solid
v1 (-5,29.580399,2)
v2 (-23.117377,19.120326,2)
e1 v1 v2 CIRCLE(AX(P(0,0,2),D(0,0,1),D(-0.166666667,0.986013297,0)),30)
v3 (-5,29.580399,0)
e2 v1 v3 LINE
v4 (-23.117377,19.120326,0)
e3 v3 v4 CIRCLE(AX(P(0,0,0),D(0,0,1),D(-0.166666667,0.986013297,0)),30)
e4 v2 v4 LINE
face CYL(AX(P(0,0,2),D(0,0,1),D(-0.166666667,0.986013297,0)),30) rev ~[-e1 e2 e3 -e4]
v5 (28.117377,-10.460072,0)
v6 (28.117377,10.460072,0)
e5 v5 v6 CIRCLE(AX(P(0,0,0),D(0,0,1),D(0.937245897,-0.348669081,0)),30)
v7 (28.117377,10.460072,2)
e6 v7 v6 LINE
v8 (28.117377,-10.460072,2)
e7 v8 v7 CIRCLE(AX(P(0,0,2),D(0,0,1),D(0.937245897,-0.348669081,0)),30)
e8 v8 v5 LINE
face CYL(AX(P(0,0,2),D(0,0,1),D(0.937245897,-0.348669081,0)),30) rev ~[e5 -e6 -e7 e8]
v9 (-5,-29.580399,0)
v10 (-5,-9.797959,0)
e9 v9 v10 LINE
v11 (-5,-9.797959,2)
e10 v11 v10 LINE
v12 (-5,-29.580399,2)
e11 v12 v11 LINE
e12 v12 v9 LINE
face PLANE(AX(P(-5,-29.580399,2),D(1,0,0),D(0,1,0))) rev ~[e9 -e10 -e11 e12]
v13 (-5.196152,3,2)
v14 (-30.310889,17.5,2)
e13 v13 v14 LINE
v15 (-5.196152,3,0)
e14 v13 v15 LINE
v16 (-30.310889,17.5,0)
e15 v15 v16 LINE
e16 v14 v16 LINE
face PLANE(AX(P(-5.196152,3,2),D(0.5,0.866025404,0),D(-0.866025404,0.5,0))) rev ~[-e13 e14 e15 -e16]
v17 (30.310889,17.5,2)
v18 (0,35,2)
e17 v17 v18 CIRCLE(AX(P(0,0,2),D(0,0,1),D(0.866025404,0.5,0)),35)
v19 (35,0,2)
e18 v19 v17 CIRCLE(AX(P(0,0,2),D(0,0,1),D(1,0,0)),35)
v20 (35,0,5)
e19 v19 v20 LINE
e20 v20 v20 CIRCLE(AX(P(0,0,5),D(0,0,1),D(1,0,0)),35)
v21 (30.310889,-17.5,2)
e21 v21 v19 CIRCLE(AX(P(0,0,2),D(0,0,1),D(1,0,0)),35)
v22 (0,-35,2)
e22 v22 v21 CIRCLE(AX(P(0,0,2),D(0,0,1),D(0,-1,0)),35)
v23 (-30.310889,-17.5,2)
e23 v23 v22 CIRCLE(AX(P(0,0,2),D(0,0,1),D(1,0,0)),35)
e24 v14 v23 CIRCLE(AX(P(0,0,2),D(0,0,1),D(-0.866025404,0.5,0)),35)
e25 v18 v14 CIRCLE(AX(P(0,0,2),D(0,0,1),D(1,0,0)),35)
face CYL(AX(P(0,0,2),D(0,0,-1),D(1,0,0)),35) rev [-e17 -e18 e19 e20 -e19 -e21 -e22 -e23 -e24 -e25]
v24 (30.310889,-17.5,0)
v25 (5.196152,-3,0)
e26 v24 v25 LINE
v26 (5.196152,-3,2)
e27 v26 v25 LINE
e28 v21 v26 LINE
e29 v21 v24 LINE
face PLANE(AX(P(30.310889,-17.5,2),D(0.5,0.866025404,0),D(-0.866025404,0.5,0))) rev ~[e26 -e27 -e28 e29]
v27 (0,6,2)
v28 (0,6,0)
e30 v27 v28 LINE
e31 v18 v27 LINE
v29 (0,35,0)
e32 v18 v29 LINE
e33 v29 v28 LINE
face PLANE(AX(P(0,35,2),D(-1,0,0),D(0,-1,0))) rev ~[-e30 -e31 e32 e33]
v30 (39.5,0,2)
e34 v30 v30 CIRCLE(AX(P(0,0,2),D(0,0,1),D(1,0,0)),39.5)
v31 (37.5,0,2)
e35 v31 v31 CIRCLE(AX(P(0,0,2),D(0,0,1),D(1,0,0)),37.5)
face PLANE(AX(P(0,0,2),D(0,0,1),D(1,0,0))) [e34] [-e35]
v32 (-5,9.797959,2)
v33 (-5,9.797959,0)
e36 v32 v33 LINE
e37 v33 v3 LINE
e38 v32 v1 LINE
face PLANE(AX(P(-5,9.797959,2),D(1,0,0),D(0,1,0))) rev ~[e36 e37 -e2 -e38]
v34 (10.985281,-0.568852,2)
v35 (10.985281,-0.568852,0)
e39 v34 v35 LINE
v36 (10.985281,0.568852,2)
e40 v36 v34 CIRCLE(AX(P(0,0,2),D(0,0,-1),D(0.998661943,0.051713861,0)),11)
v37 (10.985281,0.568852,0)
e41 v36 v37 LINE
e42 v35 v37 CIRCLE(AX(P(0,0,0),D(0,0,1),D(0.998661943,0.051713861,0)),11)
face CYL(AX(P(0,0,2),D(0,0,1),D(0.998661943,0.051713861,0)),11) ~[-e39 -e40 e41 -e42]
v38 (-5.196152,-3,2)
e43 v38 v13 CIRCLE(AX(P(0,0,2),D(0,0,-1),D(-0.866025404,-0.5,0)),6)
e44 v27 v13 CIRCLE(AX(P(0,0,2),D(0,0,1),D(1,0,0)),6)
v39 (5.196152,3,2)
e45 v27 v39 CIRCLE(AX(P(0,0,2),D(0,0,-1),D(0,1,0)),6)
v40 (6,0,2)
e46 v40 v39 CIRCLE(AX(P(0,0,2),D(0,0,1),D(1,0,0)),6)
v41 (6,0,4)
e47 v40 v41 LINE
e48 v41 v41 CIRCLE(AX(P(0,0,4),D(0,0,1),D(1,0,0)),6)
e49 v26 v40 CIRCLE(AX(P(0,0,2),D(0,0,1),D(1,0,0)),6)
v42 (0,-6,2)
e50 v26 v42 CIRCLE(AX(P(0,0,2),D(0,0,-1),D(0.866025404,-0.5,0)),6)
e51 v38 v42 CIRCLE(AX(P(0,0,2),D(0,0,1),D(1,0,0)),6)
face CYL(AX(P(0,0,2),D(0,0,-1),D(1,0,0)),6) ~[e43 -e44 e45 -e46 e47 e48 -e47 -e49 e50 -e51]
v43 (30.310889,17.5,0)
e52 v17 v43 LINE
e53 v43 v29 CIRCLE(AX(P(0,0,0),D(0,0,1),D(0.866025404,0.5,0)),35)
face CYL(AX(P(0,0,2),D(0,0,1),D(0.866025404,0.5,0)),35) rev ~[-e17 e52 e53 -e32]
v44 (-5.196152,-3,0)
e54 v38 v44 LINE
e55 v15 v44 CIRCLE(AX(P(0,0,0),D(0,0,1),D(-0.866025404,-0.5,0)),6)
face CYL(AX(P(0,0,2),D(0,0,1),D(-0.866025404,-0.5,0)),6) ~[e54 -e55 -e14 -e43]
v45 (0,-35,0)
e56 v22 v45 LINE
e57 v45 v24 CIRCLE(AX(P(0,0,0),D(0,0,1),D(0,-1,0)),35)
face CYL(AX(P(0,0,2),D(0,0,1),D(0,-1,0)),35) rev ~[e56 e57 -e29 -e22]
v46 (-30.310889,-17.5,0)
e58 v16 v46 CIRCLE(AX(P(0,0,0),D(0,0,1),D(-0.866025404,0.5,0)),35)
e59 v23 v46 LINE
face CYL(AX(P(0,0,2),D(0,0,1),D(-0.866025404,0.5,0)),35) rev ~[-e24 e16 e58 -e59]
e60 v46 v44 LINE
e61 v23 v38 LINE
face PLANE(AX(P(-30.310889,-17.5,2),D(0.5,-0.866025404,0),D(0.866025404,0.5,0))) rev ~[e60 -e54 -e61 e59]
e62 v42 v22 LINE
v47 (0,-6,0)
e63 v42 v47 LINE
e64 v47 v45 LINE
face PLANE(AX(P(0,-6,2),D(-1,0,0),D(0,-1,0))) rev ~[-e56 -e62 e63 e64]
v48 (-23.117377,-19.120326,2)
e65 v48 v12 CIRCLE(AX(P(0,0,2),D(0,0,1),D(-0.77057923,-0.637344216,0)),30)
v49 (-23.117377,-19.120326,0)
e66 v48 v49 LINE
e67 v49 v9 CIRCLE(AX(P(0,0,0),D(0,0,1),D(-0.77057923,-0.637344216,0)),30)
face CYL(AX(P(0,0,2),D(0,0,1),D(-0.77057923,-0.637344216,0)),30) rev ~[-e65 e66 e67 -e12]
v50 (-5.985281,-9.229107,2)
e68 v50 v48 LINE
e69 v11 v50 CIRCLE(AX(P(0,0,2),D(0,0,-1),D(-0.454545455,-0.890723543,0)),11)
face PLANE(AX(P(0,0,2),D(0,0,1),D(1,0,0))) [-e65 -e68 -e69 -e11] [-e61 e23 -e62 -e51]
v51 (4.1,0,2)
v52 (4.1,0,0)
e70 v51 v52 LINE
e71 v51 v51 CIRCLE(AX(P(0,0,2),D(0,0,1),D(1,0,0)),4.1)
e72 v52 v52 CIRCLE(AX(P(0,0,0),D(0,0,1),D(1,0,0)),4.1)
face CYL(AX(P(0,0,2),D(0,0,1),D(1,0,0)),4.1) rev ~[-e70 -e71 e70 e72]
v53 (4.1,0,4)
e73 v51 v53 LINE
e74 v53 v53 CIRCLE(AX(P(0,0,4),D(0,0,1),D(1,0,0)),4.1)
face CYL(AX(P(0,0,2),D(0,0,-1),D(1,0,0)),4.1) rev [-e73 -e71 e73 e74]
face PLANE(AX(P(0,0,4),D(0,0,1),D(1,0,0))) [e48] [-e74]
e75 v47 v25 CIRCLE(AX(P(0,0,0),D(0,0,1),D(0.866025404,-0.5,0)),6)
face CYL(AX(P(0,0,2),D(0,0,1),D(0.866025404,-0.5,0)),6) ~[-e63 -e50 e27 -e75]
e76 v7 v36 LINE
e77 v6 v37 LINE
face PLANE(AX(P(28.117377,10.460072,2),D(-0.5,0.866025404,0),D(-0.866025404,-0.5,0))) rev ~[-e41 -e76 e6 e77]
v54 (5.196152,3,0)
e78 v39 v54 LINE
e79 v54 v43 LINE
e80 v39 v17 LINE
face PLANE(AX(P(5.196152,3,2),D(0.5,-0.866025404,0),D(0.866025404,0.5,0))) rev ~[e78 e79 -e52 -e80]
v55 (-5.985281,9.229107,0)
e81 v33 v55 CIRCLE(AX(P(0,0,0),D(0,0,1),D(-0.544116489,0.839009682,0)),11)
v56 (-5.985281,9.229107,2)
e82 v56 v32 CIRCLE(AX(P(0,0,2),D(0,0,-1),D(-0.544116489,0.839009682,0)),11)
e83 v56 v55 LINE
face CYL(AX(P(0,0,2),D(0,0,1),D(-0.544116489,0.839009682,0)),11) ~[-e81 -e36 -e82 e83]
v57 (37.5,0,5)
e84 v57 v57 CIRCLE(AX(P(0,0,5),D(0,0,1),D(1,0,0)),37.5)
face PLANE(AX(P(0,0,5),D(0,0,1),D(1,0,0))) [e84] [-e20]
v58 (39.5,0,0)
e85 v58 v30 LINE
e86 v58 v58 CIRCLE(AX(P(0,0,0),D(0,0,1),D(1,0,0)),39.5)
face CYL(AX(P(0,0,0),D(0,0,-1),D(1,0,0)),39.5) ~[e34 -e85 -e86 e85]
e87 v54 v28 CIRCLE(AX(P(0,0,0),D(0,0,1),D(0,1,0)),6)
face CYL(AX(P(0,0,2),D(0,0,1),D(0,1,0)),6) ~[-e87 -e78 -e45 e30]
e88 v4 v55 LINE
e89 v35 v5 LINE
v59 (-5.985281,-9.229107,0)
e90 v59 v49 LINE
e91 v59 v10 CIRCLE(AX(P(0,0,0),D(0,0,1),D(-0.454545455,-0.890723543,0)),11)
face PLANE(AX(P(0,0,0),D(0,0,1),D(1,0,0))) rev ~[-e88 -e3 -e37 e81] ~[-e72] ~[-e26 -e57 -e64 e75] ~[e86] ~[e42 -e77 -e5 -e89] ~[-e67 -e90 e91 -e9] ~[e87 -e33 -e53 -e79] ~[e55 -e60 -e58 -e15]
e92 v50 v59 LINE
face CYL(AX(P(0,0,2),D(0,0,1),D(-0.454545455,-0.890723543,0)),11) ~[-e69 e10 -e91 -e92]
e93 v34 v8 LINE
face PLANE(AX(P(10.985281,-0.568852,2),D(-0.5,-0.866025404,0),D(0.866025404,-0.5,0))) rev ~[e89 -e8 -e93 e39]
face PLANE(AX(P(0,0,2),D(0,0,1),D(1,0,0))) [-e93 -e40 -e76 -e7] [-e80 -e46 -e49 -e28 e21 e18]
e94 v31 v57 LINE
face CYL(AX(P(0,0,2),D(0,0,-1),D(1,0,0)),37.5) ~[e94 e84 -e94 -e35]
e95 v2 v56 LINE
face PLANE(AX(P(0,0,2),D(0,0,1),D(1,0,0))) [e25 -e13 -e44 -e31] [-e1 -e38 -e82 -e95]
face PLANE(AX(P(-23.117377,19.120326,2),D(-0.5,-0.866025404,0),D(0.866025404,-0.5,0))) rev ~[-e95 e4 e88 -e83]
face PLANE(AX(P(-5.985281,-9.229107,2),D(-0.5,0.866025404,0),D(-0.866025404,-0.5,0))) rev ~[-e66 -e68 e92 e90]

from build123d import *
from build123d import SkipClean  # not in build123d's __all__

# Parameters (mm, degrees)
F0_R      = 39.5
F1_DEPTH  = 2
F2_R      = 37.5
F2_R_2    = 35
F3_DEPTH  = 3
F4_R      = 4.1
F5_DEPTH  = 25
F6_R      = 6
F6_R_2    = 4.1
F7_DEPTH  = 2
F9_DEPTH  = 25
F11_DEPTH = 25


# Not quite as in the source:
# - after a boolean that leaves OpenCascade's solid faulty, fix() repairs it


with BuildPart() as f1:
    # F0 (on Top) → F1 (new body)
    with BuildSketch(Plane.XY):
        Circle(F0_R)
    extrude(amount=F1_DEPTH)

    # F2 (on face) → F3 (join)
    with BuildSketch(Plane.XY.offset(2)):
        Circle(F2_R)
        Circle(F2_R_2, mode=Mode.SUBTRACT)
    extrude(amount=F3_DEPTH)

    # F4 (on face) → F5 (cut)
    with BuildSketch(Plane.XY.offset(2)):
        Circle(F4_R)
    extrude(amount=-F5_DEPTH, mode=Mode.SUBTRACT)

    # F6 (on face) → F7 (join)
    with BuildSketch(Plane.XY.offset(2)):
        Circle(F6_R)
        Circle(F6_R_2, mode=Mode.SUBTRACT)
    extrude(amount=F7_DEPTH)

    # F8 (on face) → F9 (cut)
    with BuildSketch(Plane.XY.offset(2)):
        with BuildLine():
            Line((30.3108891325, 17.5), (0, 35))
            Line((0, 35), (0, 6))
            ThreePointArc((0, 6), (3, 5.1961524227), (5.1961524227, 3))
            Line((5.1961524227, 3), (30.3108891325, 17.5))
        make_face()
        with BuildLine():
            Line((0, -35), (30.3108891325, -17.5))
            Line((30.3108891325, -17.5), (5.1961524227, -3))
            ThreePointArc((5.1961524227, -3), (3, -5.1961524227), (0, -6))
            Line((0, -6), (0, -35))
        make_face()
        with BuildLine():
            ThreePointArc((30.3108891325, 17.5), (17.5, 30.3108891325), (0, 35))
            Line((0, 35), (30.3108891325, 17.5))
        make_face()
        with BuildLine():
            ThreePointArc((0, -35), (17.5, -30.3108891325), (30.3108891325, -17.5))
            Line((30.3108891325, -17.5), (0, -35))
        make_face()
        with BuildLine():
            Line((-5.1961524227, 3), (-30.3108891325, 17.5))
            Line((-30.3108891325, 17.5), (-30.3108891325, -17.5))
            Line((-30.3108891325, -17.5), (-5.1961524227, -3))
            ThreePointArc((-5.1961524227, -3), (-6, 0), (-5.1961524227, 3))
        make_face()
        with BuildLine():
            Line((-30.3108891325, -17.5), (-30.3108891325, 17.5))
            ThreePointArc((-30.3108891325, 17.5), (-35, 0), (-30.3108891325, -17.5))
        make_face()
    with SkipClean():  # cleaning this boolean's faces spoils the solid; the shape is the same uncleaned
        extrude(amount=-F9_DEPTH, mode=Mode.SUBTRACT)

    # F10 (on face) → F11 (cut)
    with BuildSketch(Plane.XY.offset(2)):
        with BuildLine():
            Line((-5, 9.7979589711), (-5, 29.5803989155))
            ThreePointArc((-5, 29.5803989155), (-15, 25.9807621135), (-23.1173769149, 19.1203264767))
            Line((-23.1173769149, 19.1203264767), (-5.9852813742, 9.2291065045))
            ThreePointArc((-5.9852813742, 9.2291065045), (-5.5, 9.5262794416), (-5, 9.7979589711))
        make_face()
        with BuildLine():
            ThreePointArc((10.9852813742, 0.5688524666), (11, 0), (10.9852813742, -0.5688524666))
            Line((10.9852813742, -0.5688524666), (28.1173769149, -10.4600724388))
            ThreePointArc((28.1173769149, -10.4600724388), (30, 0), (28.1173769149, 10.4600724388))
            Line((28.1173769149, 10.4600724388), (10.9852813742, 0.5688524666))
        make_face()
        with BuildLine():
            ThreePointArc((-5, -9.7979589711), (-5.5, -9.5262794416), (-5.9852813742, -9.2291065045))
            Line((-5.9852813742, -9.2291065045), (-23.1173769149, -19.1203264767))
            ThreePointArc((-23.1173769149, -19.1203264767), (-15, -25.9807621135), (-5, -29.5803989155))
            Line((-5, -29.5803989155), (-5, -9.7979589711))
        make_face()
    extrude(amount=-F11_DEPTH, mode=Mode.SUBTRACT)

    add(f1.part.fix(), mode=Mode.REPLACE)


solid = f1.part
